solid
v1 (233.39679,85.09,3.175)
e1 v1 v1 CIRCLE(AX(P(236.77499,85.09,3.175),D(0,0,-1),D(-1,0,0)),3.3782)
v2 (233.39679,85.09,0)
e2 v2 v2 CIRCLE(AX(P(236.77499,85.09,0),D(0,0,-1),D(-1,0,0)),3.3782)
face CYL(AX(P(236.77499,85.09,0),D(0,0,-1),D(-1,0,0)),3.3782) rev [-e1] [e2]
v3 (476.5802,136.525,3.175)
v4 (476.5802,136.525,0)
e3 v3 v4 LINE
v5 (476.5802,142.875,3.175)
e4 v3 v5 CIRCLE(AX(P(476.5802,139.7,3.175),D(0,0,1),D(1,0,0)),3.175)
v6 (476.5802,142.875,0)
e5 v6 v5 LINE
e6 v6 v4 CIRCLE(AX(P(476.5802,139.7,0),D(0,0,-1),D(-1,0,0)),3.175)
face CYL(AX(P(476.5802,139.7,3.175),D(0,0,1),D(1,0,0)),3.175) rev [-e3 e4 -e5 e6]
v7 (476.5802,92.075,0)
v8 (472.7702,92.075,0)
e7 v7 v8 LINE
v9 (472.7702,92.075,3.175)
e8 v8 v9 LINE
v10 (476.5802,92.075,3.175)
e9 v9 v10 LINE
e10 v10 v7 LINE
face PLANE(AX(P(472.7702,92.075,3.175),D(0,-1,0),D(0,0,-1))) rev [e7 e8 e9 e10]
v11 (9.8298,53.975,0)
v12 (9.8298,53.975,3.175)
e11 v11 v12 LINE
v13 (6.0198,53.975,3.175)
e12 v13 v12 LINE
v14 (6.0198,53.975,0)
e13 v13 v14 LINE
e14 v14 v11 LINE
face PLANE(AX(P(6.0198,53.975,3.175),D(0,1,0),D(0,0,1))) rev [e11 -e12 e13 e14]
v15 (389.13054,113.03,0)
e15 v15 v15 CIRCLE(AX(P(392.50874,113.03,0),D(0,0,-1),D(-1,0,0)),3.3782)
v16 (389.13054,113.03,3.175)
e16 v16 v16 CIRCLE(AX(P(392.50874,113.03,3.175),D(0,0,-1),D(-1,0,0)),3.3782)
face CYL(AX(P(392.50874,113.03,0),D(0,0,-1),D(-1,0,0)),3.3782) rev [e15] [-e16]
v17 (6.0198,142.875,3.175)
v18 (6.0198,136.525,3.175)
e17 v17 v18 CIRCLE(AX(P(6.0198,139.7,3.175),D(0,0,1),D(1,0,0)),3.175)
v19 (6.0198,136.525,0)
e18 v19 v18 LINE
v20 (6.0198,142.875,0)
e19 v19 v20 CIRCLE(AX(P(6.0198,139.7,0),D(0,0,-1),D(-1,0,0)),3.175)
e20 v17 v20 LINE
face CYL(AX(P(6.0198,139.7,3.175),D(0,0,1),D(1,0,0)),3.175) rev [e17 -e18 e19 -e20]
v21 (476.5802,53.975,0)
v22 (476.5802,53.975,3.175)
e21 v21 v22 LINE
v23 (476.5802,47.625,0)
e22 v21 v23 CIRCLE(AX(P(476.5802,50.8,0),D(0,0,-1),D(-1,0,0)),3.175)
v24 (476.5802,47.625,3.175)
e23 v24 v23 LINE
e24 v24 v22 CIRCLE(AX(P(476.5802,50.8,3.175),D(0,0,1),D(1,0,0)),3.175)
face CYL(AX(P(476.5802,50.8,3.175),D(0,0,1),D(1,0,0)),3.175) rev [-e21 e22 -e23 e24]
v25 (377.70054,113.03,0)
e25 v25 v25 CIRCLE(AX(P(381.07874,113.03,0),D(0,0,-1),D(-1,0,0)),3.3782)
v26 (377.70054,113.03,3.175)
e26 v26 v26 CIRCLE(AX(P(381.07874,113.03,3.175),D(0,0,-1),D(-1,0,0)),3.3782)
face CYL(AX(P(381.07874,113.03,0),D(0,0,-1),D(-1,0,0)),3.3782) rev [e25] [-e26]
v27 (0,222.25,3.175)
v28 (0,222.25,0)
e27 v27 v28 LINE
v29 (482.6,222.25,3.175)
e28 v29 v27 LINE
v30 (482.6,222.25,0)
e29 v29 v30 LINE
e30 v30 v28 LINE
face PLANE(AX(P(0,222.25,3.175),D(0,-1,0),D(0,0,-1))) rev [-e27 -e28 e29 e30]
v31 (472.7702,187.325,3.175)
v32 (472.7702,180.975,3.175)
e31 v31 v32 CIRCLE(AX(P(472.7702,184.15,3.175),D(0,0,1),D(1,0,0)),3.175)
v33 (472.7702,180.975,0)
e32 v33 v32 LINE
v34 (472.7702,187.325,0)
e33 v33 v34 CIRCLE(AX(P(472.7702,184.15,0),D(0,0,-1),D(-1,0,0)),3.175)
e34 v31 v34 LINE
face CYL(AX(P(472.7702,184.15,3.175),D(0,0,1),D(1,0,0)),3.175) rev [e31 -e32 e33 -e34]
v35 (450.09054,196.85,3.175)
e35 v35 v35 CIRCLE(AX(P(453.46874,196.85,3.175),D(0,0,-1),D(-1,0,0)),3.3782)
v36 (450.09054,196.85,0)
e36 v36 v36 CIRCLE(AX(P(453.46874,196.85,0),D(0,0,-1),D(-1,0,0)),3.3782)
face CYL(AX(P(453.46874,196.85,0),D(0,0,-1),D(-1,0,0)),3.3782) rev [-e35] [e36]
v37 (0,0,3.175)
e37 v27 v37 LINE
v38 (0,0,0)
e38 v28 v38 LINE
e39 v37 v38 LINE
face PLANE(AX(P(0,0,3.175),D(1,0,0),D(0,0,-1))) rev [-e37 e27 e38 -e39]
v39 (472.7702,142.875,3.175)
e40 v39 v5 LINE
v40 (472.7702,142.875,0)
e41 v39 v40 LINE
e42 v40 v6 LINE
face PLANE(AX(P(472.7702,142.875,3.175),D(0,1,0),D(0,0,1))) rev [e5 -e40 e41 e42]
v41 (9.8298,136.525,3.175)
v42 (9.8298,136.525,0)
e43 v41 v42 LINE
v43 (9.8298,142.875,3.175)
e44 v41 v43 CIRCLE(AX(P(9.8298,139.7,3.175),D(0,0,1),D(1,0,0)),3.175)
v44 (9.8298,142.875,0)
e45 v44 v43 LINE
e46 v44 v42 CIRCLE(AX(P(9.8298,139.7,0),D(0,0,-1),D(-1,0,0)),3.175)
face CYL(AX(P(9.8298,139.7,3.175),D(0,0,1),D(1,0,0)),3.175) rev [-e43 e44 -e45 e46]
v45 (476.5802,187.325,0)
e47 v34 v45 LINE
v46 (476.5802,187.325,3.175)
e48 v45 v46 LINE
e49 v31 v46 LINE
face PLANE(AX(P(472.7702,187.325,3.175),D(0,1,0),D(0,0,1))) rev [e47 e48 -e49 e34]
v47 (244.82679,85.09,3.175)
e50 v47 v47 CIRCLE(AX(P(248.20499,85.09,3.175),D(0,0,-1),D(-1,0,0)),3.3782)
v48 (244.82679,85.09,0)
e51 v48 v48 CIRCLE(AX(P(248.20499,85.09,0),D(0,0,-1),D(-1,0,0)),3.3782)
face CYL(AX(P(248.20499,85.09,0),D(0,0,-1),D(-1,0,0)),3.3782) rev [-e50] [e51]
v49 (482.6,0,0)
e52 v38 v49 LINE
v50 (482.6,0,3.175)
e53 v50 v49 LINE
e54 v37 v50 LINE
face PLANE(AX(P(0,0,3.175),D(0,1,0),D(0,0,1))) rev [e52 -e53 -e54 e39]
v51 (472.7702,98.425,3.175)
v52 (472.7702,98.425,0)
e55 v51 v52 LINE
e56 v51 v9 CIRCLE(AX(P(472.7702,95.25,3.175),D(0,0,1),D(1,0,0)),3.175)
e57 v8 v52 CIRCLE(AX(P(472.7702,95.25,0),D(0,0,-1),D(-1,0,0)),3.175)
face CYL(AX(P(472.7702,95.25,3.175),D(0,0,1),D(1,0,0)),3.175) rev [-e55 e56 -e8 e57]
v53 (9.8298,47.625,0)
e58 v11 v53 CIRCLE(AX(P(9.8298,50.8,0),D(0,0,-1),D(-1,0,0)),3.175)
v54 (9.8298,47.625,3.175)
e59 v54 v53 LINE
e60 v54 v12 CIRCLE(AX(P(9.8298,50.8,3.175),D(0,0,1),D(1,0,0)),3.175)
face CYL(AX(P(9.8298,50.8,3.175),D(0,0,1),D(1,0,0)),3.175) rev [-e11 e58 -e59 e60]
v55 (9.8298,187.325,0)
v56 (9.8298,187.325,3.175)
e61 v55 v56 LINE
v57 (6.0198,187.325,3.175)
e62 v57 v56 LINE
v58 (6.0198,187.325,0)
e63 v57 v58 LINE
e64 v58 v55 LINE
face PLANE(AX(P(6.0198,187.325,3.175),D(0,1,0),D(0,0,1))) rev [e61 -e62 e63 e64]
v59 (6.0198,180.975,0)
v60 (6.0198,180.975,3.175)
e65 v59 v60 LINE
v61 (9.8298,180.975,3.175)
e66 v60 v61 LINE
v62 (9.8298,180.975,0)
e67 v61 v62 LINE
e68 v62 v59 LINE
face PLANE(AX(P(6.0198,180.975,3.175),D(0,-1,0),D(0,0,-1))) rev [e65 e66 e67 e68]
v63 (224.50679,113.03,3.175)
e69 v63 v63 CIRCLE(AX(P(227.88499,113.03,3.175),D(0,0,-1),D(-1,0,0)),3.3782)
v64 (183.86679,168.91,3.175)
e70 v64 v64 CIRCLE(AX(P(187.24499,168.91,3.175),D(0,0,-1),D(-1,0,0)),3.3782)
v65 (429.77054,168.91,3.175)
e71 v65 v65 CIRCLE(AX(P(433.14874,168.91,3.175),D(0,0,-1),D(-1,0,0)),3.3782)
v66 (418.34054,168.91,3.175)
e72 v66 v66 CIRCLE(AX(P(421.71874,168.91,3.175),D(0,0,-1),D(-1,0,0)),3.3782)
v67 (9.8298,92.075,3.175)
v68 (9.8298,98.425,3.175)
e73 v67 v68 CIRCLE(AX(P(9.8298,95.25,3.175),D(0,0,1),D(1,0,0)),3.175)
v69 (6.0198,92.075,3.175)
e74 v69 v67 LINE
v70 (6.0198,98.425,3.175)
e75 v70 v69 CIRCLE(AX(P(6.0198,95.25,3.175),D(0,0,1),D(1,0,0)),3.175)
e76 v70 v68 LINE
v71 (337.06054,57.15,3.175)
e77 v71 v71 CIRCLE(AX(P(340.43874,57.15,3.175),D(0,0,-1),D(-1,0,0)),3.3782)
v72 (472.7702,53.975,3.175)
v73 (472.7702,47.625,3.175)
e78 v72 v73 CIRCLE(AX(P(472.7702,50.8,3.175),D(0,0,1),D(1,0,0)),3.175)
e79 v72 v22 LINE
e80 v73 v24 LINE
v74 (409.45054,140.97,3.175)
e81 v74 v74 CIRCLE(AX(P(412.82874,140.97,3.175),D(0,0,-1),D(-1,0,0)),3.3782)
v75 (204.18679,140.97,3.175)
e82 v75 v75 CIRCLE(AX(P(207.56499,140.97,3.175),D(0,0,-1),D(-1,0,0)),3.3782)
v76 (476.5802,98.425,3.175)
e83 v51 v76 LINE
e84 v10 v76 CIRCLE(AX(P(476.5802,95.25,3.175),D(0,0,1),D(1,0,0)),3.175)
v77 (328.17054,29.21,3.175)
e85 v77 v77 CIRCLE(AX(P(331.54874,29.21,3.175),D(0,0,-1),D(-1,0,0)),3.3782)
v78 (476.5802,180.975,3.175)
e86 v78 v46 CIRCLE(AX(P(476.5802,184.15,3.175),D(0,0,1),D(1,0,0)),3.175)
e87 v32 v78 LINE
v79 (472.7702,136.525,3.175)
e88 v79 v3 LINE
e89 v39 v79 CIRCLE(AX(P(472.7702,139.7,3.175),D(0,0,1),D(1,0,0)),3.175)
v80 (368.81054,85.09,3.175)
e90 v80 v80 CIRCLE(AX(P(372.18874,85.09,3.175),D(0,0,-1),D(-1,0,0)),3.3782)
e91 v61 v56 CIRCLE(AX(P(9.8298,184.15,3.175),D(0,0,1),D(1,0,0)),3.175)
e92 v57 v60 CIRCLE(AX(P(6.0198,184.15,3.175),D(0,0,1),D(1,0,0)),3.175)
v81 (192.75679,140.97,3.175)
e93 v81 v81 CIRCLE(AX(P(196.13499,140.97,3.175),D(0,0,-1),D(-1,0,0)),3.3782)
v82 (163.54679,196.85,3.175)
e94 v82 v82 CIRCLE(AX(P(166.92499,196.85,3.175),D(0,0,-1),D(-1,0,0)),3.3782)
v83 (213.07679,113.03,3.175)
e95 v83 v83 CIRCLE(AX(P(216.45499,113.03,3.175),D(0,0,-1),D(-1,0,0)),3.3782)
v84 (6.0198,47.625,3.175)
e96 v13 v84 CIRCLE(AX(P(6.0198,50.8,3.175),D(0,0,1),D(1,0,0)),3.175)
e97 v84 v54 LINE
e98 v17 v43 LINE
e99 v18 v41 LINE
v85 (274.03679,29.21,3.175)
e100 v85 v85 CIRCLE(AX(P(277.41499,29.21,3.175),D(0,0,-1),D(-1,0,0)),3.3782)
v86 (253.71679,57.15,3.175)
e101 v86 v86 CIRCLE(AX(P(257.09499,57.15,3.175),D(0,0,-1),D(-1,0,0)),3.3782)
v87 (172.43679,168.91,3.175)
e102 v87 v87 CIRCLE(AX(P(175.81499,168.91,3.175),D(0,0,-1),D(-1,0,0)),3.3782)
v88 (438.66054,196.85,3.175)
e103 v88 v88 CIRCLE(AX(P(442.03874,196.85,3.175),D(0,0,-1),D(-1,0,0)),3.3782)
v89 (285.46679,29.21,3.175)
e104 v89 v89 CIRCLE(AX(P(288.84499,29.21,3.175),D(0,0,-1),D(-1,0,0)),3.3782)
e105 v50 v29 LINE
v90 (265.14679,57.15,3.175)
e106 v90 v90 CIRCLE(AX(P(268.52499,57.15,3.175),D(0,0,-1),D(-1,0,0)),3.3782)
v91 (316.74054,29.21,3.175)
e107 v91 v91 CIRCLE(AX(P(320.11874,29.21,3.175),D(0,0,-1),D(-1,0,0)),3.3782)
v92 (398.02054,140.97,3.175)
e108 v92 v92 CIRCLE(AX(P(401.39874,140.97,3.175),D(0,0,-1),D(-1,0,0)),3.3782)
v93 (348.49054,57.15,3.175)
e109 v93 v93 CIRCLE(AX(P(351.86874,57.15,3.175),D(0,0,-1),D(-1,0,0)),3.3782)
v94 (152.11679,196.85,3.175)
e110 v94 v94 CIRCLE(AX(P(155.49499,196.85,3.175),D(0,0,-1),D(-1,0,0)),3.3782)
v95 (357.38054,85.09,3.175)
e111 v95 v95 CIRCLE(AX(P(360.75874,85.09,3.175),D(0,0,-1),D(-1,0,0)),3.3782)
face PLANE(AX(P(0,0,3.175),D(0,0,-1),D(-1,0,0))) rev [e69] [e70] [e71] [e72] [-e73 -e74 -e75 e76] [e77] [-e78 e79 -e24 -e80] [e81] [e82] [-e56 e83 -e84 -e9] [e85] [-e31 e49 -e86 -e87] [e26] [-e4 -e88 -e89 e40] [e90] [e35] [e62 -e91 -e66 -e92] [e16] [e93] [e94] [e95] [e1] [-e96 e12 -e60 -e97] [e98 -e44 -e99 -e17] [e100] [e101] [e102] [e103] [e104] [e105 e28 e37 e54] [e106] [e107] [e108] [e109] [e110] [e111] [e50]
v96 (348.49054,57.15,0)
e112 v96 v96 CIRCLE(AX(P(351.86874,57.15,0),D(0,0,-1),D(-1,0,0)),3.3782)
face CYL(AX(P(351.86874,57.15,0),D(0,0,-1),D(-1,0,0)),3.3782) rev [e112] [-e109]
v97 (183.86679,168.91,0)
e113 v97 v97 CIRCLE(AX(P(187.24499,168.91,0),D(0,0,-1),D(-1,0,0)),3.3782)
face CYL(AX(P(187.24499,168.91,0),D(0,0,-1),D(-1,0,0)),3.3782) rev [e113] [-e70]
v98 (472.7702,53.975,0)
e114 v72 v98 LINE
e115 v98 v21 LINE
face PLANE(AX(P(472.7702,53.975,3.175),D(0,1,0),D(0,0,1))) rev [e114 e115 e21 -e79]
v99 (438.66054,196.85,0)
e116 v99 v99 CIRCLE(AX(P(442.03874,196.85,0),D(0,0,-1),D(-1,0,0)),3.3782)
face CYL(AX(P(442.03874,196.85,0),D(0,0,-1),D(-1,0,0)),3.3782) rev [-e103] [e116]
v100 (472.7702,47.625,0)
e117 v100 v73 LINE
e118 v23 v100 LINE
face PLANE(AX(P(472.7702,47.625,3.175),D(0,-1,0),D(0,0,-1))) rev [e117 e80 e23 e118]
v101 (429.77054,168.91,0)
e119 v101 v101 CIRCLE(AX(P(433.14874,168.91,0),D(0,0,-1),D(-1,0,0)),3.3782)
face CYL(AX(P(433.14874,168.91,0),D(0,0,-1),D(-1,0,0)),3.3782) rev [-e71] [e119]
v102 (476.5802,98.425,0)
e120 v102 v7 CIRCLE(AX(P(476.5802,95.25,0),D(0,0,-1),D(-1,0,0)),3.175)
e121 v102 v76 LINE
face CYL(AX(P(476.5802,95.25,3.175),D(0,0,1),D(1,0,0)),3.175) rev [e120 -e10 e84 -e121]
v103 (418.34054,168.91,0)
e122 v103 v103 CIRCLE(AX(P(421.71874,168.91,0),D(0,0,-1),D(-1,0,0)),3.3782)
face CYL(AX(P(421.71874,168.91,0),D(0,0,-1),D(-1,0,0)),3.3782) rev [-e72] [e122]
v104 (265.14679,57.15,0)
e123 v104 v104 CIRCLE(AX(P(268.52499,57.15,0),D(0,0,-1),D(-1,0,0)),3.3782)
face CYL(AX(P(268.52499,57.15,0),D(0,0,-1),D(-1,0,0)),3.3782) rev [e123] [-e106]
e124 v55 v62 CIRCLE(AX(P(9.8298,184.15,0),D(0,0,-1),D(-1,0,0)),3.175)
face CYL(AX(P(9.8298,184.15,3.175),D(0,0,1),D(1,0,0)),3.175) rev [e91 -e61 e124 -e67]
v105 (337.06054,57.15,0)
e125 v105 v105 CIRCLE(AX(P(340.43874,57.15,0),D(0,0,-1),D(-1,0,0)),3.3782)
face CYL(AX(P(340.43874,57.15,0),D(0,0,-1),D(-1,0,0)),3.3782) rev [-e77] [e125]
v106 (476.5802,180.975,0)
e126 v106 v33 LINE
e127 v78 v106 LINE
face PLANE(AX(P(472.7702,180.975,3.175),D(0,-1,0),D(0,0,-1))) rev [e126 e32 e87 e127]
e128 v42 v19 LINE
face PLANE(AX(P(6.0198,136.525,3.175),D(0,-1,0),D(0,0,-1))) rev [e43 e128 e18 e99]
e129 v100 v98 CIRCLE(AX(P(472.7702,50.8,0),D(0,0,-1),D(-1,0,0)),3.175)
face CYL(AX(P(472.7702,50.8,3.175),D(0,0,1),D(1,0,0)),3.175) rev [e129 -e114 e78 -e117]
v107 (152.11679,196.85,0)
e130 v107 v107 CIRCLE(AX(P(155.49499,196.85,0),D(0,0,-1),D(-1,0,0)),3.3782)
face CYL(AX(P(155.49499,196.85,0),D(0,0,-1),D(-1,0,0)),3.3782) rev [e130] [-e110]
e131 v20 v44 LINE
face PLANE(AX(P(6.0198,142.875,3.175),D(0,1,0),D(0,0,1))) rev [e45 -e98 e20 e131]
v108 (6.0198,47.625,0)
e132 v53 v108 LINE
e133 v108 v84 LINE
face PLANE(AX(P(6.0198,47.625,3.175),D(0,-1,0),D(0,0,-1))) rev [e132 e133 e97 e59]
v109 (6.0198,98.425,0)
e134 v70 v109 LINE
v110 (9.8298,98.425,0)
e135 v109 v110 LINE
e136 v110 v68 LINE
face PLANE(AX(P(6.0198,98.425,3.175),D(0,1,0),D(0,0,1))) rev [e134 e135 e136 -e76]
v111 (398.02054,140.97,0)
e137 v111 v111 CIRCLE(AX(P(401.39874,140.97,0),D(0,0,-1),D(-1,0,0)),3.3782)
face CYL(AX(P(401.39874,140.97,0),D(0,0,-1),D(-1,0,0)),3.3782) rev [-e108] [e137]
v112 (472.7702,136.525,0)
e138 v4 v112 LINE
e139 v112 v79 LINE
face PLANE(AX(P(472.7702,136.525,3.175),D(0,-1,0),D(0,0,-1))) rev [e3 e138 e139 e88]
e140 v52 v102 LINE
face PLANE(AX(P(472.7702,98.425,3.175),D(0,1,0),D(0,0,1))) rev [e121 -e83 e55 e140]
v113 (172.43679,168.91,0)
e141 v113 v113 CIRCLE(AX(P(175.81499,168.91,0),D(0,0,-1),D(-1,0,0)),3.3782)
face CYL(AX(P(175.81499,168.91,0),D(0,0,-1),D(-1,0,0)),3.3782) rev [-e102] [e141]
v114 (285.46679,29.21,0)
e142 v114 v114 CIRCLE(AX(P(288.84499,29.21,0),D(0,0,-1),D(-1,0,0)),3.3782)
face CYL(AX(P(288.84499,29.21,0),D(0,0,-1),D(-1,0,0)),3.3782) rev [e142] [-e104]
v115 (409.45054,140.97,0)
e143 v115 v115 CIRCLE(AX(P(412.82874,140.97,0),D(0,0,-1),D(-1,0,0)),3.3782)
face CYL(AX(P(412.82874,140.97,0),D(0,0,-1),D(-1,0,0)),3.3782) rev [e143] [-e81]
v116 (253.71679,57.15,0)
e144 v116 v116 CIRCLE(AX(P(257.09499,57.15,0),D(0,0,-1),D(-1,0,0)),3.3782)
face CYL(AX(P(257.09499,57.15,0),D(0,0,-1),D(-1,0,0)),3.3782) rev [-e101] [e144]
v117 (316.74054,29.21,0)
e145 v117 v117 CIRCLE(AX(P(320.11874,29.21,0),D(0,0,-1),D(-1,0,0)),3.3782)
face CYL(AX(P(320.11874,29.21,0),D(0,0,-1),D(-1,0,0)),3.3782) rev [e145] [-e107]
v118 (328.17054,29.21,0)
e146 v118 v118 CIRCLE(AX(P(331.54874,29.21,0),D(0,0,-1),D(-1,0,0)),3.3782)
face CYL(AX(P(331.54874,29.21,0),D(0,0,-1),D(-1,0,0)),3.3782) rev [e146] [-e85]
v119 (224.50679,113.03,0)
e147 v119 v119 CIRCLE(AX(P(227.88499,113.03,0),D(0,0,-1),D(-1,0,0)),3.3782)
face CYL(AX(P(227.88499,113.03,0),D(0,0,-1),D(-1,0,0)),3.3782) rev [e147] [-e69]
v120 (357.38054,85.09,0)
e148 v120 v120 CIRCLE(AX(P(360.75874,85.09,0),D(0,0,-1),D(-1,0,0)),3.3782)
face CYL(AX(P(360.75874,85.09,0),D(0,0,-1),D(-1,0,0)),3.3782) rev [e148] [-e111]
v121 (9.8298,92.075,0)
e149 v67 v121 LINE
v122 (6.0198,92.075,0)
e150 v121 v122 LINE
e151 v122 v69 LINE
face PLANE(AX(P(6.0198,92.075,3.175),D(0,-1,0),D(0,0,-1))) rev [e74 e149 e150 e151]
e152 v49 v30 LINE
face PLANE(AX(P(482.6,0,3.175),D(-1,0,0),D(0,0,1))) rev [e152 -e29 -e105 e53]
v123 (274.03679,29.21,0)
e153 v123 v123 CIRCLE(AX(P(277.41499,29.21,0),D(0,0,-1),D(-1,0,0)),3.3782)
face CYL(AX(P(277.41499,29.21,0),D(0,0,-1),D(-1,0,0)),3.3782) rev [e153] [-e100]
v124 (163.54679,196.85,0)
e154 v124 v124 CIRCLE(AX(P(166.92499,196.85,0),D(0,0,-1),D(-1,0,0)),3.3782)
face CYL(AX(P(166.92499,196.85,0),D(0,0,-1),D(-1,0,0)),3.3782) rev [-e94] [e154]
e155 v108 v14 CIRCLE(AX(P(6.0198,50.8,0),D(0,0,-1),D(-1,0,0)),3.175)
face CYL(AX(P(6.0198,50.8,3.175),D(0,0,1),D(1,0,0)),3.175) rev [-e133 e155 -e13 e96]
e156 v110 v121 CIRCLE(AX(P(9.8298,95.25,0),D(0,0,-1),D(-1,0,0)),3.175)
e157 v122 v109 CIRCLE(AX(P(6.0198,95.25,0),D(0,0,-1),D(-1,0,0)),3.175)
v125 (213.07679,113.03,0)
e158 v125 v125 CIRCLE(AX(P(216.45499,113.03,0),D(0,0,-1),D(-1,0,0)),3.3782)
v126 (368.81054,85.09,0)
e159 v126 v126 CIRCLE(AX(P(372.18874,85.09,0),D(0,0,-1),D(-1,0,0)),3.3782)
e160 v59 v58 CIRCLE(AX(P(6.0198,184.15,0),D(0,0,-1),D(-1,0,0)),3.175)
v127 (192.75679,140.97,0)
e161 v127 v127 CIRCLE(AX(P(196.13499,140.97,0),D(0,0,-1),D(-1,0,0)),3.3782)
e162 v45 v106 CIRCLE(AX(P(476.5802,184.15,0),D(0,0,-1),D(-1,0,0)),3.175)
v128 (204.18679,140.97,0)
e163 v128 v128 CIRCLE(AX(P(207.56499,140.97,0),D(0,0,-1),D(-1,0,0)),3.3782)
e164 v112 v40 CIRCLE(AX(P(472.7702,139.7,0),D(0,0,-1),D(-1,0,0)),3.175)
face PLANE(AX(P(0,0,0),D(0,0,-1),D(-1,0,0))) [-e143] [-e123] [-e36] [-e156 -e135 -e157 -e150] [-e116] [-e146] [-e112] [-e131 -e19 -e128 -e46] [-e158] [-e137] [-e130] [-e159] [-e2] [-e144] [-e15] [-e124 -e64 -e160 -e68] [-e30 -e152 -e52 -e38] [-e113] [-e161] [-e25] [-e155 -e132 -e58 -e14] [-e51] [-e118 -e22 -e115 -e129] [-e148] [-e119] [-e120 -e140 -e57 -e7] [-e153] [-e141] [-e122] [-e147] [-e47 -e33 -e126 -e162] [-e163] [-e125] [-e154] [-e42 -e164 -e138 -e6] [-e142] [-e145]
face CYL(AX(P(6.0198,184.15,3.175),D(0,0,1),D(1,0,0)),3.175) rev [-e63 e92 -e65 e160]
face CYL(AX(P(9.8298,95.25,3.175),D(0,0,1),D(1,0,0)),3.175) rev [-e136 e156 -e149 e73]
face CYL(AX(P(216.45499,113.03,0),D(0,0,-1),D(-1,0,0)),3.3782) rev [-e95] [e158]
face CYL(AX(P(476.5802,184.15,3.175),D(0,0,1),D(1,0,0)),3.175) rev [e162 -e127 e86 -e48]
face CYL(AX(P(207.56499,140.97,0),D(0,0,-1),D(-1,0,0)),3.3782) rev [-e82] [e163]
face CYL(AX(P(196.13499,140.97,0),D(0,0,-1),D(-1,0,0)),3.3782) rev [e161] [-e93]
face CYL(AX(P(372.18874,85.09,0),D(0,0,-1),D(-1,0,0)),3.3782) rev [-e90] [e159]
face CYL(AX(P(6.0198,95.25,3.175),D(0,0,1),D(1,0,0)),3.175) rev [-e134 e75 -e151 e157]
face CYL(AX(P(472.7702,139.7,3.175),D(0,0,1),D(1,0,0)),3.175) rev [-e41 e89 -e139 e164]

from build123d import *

# Parameters (mm, degrees)
SKETCH1_W                           = 482.6
SKETCH1_H                           = 222.25
BOSS_EXTRUDE1_DEPTH                 = 3.175
F_1_4_CLEARANCE_HOLE1_D             = 6.7564
F_1_4_CLEARANCE_HOLE1_DEPTH         = 19.05
F_1_4_CLEARANCE_HOLE1_TIP           = 2.029827343
TAP_DRILL_SLOT_FOR_10_24_TAP1_DEPTH = 3.175


# Read off the part's stored shape, not the designer's step: Tap Drill Slot for #10-24 Tap1
with BuildPart() as part:
    # Sketch1 → Boss-Extrude1 (new body)
    with BuildSketch(Plane.XY):
        with Locations((241.3, 111.125)):
            Rectangle(SKETCH1_W, SKETCH1_H)
    extrude(amount=BOSS_EXTRUDE1_DEPTH)

    # 1/4 Clearance Hole1
    with Locations(Plane(origin=(-396.999136144, -1332.621924612, 0), x_dir=(-1, 0, 0), z_dir=(0, 0, -1))):
        with Locations((-850.467876144, 1529.471924612), (-839.037876144, 1529.471924612), (-830.147876144, 1501.531924612), (-818.717876144, 1501.531924612), (-809.827876144, 1473.591924612), (-798.397876144, 1473.591924612), (-789.507876144, 1445.651924612), (-778.077876144, 1445.651924612), (-769.187876144, 1417.711924612), (-757.757876144, 1417.711924612), (-748.867876144, 1389.771924612), (-737.437876144, 1389.771924612), (-728.547876144, 1361.831924612), (-717.117876144, 1361.831924612), (-685.844126144, 1361.831924612), (-674.414126144, 1361.831924612), (-665.524126144, 1389.771924612), (-654.094126144, 1389.771924612), (-645.204126144, 1417.711924612), (-633.774126144, 1417.711924612), (-624.884126144, 1445.651924612), (-613.454126144, 1445.651924612), (-604.564126144, 1473.591924612), (-593.134126144, 1473.591924612), (-584.244126144, 1501.531924612), (-572.814126144, 1501.531924612), (-563.924126144, 1529.471924612), (-552.494126144, 1529.471924612)):
            Hole(F_1_4_CLEARANCE_HOLE1_D / 2, depth=F_1_4_CLEARANCE_HOLE1_DEPTH)
            with Locations((0, 0, -(F_1_4_CLEARANCE_HOLE1_DEPTH + F_1_4_CLEARANCE_HOLE1_TIP / 2))):  # 118° drill point
                Cone(0, F_1_4_CLEARANCE_HOLE1_D / 2, F_1_4_CLEARANCE_HOLE1_TIP, mode=Mode.SUBTRACT)

    # Tap Drill Slot for #10-24 Tap1 outline → Tap Drill Slot for #10-24 Tap1 (cut)
    with BuildSketch(Plane.XY):
        with BuildLine():
            Line((472.7702, 180.975), (476.5802, 180.975))
            ThreePointArc((476.5802, 180.975), (479.7552, 184.15), (476.5802, 187.325))
            Line((476.5802, 187.325), (472.7702, 187.325))
            ThreePointArc((472.7702, 187.325), (469.5952, 184.15), (472.7702, 180.975))
        make_face()
        with BuildLine():
            ThreePointArc((9.8298, 180.975), (13.0048, 184.15), (9.8298, 187.325))
            Line((9.8298, 187.325), (6.0198, 187.325))
            ThreePointArc((6.0198, 187.325), (2.8448, 184.15), (6.0198, 180.975))
            Line((6.0198, 180.975), (9.8298, 180.975))
        make_face()
        with BuildLine():
            Line((472.7702, 136.525), (476.5802, 136.525))
            ThreePointArc((476.5802, 136.525), (479.7552, 139.7), (476.5802, 142.875))
            Line((476.5802, 142.875), (472.7702, 142.875))
            ThreePointArc((472.7702, 142.875), (469.5952, 139.7), (472.7702, 136.525))
        make_face()
        with BuildLine():
            ThreePointArc((9.8298, 136.525), (13.0048, 139.7), (9.8298, 142.875))
            Line((9.8298, 142.875), (6.0198, 142.875))
            ThreePointArc((6.0198, 142.875), (2.8448, 139.7), (6.0198, 136.525))
            Line((6.0198, 136.525), (9.8298, 136.525))
        make_face()
        with BuildLine():
            Line((472.7702, 92.075), (476.5802, 92.075))
            ThreePointArc((476.5802, 92.075), (479.7552, 95.25), (476.5802, 98.425))
            Line((476.5802, 98.425), (472.7702, 98.425))
            ThreePointArc((472.7702, 98.425), (469.5952, 95.25), (472.7702, 92.075))
        make_face()
        with BuildLine():
            ThreePointArc((9.8298, 92.075), (13.0048, 95.25), (9.8298, 98.425))
            Line((9.8298, 98.425), (6.0198, 98.425))
            ThreePointArc((6.0198, 98.425), (2.8448, 95.25), (6.0198, 92.075))
            Line((6.0198, 92.075), (9.8298, 92.075))
        make_face()
        with BuildLine():
            Line((472.7702, 47.625), (476.5802, 47.625))
            ThreePointArc((476.5802, 47.625), (479.7552, 50.8), (476.5802, 53.975))
            Line((476.5802, 53.975), (472.7702, 53.975))
            ThreePointArc((472.7702, 53.975), (469.5952, 50.8), (472.7702, 47.625))
        make_face()
        with BuildLine():
            ThreePointArc((9.8298, 47.625), (13.0048, 50.8), (9.8298, 53.975))
            Line((9.8298, 53.975), (6.0198, 53.975))
            ThreePointArc((6.0198, 53.975), (2.8448, 50.8), (6.0198, 47.625))
            Line((6.0198, 47.625), (9.8298, 47.625))
        make_face()
    extrude(amount=TAP_DRILL_SLOT_FOR_10_24_TAP1_DEPTH, mode=Mode.SUBTRACT)


solid = part.part
